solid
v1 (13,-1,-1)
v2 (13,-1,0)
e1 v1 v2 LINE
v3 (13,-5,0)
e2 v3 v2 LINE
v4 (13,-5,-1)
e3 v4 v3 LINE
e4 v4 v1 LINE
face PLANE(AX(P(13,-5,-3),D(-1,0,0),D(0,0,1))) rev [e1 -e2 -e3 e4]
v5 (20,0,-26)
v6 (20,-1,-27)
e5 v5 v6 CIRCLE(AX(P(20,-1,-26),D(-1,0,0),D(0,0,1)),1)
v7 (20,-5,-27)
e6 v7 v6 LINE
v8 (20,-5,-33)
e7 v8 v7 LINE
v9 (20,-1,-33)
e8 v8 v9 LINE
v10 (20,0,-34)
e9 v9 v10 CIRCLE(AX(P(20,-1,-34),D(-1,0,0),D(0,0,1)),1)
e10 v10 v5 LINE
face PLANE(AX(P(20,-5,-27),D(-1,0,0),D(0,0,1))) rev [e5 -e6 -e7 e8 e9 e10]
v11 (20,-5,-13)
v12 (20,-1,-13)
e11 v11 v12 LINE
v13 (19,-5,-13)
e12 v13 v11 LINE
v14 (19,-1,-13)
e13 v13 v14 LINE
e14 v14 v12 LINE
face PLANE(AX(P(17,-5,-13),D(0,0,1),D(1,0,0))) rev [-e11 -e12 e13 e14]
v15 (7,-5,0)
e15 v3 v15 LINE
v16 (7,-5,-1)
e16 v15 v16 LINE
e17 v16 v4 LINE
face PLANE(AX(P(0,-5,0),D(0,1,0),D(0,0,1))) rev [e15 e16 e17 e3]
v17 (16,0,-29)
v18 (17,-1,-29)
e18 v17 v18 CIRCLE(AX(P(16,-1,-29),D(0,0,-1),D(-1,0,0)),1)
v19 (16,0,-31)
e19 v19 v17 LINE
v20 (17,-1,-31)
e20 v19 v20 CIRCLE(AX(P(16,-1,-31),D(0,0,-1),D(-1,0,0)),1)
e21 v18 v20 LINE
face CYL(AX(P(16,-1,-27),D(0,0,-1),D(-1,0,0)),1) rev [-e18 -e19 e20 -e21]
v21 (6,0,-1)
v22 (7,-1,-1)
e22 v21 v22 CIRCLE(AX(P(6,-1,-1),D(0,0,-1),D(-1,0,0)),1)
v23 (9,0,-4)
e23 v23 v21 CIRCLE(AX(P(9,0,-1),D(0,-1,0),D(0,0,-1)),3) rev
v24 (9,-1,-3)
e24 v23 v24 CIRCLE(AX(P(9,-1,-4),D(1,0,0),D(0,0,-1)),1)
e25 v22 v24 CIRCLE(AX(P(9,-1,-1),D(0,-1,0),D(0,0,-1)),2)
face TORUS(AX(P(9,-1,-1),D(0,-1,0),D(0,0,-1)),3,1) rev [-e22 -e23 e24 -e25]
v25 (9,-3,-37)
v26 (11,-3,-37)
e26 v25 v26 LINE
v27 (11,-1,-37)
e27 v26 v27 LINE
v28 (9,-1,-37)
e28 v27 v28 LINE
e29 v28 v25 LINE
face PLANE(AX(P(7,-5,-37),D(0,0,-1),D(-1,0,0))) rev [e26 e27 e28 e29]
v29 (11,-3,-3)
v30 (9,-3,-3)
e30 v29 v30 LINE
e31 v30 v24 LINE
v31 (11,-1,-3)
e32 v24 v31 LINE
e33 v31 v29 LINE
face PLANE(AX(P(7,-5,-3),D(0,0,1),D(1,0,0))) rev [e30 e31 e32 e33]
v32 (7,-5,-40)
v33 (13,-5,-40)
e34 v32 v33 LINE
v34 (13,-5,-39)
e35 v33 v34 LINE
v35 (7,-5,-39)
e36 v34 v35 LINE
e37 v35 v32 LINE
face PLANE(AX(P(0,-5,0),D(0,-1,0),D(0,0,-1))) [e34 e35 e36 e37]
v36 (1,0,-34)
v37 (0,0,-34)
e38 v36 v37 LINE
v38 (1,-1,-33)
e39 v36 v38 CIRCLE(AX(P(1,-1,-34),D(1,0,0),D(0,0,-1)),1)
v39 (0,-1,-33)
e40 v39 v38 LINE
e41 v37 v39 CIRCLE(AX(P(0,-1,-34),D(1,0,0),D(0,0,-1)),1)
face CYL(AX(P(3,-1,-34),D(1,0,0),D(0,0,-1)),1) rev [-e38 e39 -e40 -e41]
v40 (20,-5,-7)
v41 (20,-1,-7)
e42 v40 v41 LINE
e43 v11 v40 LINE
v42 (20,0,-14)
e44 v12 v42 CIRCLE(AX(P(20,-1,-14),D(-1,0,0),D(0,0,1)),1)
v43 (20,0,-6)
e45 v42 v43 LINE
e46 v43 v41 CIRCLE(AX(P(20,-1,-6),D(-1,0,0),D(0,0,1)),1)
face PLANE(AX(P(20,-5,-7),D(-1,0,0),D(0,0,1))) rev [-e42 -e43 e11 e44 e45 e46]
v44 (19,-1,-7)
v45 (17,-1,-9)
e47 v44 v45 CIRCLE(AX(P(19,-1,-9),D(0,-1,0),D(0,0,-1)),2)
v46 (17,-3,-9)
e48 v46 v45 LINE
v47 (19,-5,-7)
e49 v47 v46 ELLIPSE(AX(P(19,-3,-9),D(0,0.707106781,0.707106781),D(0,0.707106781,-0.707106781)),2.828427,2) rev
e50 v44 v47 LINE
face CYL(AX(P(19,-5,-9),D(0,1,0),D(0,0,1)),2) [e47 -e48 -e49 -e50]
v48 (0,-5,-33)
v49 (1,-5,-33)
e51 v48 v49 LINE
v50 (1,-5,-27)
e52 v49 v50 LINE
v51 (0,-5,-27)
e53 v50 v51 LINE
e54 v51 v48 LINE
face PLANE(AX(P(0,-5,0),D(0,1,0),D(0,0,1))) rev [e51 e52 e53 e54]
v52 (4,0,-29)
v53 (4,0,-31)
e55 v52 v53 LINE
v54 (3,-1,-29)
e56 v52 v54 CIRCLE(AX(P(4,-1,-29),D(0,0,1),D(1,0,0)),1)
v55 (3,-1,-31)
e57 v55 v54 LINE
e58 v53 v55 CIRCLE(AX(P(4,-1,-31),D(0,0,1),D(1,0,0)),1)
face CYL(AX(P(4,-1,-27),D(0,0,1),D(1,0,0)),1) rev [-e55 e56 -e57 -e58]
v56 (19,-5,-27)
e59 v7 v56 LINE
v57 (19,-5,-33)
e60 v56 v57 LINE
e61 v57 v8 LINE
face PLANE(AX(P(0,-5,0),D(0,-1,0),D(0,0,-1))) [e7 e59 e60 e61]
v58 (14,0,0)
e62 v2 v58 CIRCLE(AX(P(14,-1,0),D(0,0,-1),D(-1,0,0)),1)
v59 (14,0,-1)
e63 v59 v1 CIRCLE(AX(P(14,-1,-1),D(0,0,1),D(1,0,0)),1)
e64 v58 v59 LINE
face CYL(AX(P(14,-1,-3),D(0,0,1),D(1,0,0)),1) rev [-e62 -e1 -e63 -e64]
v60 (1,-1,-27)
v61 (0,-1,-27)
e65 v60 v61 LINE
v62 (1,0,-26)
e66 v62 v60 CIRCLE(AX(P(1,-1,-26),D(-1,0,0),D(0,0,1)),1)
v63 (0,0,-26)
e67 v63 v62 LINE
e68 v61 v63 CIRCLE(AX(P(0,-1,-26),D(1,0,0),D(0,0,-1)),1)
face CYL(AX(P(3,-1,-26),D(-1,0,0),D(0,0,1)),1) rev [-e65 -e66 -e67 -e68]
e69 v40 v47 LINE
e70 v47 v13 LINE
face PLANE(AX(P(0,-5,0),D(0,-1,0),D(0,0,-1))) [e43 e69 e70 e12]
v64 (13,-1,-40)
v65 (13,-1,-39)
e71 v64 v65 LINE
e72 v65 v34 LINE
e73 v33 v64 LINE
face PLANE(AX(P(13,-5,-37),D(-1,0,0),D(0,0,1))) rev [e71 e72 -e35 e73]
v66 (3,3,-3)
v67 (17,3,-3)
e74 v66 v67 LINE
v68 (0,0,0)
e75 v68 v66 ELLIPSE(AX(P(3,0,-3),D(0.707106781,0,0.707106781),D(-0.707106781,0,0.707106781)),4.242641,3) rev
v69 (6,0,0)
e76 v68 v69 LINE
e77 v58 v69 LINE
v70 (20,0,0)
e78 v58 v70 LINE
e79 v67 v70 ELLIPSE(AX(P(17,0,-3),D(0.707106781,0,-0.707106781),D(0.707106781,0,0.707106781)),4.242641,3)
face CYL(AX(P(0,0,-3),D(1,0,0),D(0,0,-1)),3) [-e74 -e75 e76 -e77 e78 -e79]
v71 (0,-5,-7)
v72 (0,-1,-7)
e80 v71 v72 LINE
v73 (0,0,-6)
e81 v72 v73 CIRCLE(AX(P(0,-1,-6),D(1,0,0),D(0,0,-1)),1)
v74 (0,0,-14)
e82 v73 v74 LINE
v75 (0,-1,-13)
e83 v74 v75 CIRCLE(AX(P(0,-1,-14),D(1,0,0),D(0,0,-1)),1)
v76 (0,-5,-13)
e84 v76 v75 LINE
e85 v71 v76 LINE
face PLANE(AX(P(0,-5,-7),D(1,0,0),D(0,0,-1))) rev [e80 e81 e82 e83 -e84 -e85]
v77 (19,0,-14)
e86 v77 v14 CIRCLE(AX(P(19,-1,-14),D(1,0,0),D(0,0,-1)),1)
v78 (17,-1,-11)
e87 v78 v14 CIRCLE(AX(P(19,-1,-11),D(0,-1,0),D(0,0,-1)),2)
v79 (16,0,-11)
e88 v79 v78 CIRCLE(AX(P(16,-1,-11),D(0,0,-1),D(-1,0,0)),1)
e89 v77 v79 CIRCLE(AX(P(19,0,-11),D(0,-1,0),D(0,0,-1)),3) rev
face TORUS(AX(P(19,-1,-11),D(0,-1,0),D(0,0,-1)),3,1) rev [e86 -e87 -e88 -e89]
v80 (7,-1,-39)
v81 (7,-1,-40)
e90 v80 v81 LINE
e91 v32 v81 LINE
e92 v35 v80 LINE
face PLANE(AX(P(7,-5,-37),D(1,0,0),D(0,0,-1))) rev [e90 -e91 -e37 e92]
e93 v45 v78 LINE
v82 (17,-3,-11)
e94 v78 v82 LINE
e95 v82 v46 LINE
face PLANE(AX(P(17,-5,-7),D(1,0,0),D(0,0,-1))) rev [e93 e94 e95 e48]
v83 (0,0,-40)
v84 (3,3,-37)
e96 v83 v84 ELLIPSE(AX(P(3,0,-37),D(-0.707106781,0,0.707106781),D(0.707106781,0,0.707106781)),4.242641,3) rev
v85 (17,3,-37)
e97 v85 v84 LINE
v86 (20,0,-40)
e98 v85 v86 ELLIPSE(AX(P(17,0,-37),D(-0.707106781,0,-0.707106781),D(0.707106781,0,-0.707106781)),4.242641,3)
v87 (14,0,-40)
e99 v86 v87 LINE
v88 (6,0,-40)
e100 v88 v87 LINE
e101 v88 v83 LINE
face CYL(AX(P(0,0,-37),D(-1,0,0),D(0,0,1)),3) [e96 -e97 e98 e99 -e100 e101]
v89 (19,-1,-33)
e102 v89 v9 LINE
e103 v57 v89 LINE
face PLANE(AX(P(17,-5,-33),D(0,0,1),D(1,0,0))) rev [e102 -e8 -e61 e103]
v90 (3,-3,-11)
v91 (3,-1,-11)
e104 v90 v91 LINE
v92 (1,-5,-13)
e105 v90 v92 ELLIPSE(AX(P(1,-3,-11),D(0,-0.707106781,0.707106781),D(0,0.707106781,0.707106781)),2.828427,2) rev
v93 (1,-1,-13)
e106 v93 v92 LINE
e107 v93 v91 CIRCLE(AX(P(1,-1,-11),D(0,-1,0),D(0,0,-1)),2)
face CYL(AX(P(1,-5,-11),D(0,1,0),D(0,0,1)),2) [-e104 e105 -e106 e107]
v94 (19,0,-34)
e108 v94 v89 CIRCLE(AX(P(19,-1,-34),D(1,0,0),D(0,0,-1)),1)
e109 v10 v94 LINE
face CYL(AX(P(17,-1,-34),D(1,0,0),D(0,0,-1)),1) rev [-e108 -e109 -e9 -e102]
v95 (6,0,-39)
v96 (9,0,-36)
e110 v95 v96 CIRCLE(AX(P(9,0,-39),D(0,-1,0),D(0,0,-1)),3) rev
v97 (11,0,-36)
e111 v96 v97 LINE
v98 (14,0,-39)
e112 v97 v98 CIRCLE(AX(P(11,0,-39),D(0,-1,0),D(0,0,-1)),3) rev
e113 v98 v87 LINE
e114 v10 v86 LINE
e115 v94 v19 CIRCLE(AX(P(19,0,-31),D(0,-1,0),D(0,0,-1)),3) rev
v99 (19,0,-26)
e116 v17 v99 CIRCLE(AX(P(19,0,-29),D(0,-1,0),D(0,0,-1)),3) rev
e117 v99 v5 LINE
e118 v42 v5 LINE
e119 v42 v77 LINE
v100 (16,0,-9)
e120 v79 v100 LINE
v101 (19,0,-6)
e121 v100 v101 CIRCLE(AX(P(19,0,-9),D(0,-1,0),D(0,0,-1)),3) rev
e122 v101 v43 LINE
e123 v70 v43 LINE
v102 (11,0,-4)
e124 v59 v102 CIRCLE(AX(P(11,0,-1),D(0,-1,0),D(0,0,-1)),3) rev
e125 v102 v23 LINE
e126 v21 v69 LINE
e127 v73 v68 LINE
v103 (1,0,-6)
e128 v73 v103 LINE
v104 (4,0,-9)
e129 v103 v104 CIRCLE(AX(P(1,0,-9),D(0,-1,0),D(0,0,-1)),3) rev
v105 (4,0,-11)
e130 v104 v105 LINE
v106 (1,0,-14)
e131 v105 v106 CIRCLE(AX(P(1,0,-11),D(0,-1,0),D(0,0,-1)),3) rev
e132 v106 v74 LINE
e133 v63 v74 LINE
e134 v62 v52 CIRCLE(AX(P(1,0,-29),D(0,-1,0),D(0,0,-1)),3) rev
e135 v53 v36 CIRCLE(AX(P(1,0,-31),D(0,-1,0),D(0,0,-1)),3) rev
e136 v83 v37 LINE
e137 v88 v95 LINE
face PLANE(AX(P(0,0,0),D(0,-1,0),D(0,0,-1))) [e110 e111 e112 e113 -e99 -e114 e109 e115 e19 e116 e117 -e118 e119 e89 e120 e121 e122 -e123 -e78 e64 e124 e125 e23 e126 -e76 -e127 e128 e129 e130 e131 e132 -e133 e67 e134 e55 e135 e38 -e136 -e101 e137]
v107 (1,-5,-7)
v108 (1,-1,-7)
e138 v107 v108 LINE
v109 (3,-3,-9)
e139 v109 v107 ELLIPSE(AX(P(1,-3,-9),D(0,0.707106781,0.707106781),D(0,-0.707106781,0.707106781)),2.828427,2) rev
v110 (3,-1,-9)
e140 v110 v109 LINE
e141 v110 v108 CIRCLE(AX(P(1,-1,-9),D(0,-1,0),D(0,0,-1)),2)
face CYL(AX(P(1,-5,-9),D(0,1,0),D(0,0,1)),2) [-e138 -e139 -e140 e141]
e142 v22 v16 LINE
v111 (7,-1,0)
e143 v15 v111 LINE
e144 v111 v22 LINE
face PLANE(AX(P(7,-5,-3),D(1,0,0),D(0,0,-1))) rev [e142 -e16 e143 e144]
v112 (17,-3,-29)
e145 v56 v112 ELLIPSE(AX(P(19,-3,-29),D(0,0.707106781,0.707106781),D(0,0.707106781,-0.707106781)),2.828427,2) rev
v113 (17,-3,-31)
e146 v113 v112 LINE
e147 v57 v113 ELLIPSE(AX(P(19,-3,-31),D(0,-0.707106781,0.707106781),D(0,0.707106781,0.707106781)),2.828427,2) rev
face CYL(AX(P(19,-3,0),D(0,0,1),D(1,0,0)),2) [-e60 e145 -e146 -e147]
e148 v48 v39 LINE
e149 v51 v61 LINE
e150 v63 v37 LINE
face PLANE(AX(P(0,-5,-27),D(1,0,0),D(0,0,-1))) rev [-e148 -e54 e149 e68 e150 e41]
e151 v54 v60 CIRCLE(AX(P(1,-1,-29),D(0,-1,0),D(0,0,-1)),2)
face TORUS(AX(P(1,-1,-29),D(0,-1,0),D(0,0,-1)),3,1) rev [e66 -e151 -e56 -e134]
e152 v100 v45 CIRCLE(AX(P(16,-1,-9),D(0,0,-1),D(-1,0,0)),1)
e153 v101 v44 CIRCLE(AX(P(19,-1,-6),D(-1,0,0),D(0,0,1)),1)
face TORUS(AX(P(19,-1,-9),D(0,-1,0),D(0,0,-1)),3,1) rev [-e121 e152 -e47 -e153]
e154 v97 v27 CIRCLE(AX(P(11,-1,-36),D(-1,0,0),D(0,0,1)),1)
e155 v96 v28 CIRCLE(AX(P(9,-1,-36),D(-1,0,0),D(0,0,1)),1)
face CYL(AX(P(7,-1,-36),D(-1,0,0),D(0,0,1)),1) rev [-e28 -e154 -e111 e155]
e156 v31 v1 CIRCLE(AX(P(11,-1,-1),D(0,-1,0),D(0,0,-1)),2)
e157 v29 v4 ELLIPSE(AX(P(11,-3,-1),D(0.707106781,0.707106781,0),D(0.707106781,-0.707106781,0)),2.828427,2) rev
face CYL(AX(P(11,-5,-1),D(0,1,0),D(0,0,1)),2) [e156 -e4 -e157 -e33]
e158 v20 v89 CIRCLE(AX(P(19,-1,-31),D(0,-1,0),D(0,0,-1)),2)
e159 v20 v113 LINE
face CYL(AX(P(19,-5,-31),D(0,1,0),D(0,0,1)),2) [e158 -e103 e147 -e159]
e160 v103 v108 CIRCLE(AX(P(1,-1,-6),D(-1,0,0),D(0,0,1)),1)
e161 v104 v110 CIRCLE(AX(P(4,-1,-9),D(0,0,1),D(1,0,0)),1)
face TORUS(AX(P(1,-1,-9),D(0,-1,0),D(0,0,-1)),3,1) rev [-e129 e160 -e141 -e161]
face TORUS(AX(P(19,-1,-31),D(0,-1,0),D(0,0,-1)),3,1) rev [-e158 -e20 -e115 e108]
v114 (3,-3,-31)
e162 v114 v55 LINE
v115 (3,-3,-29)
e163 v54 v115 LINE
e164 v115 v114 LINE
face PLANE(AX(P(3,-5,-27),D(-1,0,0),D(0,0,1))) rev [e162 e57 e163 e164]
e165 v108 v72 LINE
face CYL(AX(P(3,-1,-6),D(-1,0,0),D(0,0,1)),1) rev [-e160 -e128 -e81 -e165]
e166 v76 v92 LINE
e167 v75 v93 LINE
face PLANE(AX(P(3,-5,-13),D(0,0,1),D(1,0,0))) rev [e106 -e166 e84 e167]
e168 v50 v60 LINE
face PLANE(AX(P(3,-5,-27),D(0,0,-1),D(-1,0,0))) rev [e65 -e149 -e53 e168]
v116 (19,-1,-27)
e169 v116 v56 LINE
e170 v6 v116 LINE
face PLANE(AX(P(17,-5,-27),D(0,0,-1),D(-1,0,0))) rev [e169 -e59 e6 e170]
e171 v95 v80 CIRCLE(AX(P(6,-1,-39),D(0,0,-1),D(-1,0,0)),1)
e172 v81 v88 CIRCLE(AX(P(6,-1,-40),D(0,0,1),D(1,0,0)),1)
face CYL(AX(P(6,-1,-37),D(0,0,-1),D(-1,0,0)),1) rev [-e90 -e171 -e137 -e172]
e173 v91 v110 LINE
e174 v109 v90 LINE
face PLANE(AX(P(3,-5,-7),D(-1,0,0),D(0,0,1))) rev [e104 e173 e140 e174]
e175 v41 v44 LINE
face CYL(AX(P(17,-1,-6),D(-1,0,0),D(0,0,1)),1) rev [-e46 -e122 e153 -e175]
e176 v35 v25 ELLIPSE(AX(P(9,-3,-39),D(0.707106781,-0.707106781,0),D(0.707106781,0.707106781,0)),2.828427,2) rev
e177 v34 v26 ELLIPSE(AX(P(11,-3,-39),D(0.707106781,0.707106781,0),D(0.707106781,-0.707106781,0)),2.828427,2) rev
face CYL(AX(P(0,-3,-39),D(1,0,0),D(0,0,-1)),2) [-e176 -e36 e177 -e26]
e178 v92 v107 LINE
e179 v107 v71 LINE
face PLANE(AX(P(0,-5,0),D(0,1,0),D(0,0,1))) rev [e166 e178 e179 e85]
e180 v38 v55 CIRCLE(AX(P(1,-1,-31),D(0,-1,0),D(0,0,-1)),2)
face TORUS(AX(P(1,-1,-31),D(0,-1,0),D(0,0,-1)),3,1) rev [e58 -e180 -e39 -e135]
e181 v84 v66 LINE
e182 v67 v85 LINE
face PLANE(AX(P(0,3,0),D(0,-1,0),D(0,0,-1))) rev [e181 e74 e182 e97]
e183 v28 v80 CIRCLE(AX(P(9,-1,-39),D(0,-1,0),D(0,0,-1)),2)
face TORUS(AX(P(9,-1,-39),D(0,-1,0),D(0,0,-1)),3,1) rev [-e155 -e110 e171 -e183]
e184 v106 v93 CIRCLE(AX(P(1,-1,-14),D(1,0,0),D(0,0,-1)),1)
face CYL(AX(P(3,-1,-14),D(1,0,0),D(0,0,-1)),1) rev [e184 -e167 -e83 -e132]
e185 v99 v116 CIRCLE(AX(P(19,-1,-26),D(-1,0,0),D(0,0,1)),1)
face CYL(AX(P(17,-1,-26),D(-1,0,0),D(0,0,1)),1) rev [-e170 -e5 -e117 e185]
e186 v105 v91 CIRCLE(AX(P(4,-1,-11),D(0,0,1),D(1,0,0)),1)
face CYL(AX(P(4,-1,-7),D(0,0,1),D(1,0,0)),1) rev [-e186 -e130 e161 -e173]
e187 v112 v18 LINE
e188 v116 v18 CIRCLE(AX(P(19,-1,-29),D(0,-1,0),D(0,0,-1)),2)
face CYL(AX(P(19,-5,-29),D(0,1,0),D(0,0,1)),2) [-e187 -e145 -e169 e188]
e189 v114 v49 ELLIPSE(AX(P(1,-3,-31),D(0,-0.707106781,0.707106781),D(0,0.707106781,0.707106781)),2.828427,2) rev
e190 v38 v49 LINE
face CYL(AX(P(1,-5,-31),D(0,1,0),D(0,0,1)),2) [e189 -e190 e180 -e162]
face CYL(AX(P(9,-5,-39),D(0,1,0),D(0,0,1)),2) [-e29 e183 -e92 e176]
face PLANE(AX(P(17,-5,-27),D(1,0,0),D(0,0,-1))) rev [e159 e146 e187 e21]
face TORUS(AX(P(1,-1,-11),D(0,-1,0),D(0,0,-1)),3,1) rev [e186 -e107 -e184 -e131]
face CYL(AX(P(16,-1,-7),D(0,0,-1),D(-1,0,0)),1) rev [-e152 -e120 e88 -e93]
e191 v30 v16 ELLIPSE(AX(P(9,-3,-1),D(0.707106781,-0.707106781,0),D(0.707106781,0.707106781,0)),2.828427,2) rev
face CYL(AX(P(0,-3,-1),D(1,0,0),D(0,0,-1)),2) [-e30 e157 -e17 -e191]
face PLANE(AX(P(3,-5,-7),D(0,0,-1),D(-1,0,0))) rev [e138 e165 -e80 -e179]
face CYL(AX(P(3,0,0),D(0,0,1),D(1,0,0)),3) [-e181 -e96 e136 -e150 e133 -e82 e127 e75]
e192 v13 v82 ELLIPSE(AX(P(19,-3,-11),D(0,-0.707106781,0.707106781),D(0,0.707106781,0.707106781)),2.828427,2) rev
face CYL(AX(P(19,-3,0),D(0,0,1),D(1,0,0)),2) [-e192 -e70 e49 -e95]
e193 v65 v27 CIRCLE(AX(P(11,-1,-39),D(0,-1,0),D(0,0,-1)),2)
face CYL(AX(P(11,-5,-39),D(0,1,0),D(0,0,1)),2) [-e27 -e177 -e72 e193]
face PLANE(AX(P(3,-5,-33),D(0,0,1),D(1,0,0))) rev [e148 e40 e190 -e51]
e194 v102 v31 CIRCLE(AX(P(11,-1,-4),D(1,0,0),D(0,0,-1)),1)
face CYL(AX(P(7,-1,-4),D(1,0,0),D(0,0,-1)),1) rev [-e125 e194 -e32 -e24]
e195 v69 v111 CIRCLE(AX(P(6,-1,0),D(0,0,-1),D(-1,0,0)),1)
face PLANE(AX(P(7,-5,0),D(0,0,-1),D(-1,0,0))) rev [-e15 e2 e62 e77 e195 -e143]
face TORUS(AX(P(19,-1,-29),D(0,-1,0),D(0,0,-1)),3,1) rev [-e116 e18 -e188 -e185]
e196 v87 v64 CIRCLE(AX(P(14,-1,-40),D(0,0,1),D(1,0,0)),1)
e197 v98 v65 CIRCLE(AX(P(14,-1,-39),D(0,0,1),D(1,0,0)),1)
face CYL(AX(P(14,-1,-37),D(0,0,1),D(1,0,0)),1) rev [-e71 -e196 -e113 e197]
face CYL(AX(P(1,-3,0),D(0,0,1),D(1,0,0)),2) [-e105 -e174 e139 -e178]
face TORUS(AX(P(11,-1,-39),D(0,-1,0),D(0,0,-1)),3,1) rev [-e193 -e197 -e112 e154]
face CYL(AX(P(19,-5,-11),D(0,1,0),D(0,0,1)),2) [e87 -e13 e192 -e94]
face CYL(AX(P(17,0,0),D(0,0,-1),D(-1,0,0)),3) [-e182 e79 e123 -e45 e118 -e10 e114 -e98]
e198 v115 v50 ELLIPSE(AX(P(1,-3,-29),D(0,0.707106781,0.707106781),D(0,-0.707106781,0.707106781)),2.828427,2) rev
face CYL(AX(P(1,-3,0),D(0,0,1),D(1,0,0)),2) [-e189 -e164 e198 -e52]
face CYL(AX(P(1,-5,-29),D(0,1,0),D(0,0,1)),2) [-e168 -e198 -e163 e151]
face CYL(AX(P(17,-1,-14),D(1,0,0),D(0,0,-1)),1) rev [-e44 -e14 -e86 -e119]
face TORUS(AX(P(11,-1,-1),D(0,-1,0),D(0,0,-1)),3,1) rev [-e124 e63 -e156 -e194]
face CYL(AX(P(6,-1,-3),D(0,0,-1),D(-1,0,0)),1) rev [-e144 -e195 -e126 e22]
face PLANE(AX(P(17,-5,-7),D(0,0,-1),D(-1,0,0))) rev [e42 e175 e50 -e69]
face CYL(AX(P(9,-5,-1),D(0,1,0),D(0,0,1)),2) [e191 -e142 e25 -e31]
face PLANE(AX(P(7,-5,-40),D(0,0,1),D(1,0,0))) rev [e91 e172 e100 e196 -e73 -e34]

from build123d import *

# Parameters (mm, degrees)
ESBO_O1_W                = 20
ESBO_O1_H                = 40
RESSALTO_EXTRUS_O1_DEPTH = 3
FILETE1_R                = 3
ESBO_O2_W                = 6
ESBO_O2_H                = 3
ESBO_O2_W_2              = 3
ESBO_O2_H_2              = 6
RESSALTO_EXTRUS_O2_DEPTH = 5
FILETE2_R                = 2
FILETE3_R                = 1


with BuildPart() as part:
    # Esboço1 → Ressalto-extrusão1 (new body)
    with BuildSketch(Plane(origin=(0, 0, 0), x_dir=(1, 0, 0), z_dir=(0, 1, 0))):
        with Locations((10, 20)):
            Rectangle(ESBO_O1_W, ESBO_O1_H)
    extrude(amount=RESSALTO_EXTRUS_O1_DEPTH)

    # Filete1
    filete1_edges = [part.edges().sort_by_distance(p)[0] for p in [
        (10, 3, -40),
        (20, 3, -20),
        (10, 3, 0),
        (0, 3, -20),
    ]]
    fillet(filete1_edges, radius=FILETE1_R - 0.0001)  # a hair under: the kernel refuses the full size

    # Esboço2 → Ressalto-extrusão2 (add)
    with BuildSketch(Plane.XZ):
        with Locations((10, -1.5)):
            Rectangle(ESBO_O2_W, ESBO_O2_H)
        with Locations((10, -38.5)):
            Rectangle(ESBO_O2_W, ESBO_O2_H)
        with Locations((1.5, -30)):
            Rectangle(ESBO_O2_W_2, ESBO_O2_H_2)
        with Locations((18.5, -10)):
            Rectangle(ESBO_O2_W_2, ESBO_O2_H_2)
        with Locations((18.5, -30)):
            Rectangle(ESBO_O2_W_2, ESBO_O2_H_2)
        with Locations((1.5, -10)):
            Rectangle(ESBO_O2_W_2, ESBO_O2_H_2)
    extrude(amount=RESSALTO_EXTRUS_O2_DEPTH)

    # Filete2
    filete2_edges = [part.edges().sort_by_distance(p)[0] for p in [
        (13, -2.5, -3),
        (7, -2.5, -3),
        (10, -5, -3),
        (7, -2.5, -37),
        (13, -2.5, -37),
        (10, -5, -37),
        (17, -2.5, -7),
        (17, -2.5, -13),
        (17, -5, -10),
        (17, -2.5, -27),
        (17, -2.5, -33),
        (17, -5, -30),
        (3, -2.5, -33),
        (3, -2.5, -27),
        (3, -5, -30),
        (3, -2.5, -13),
        (3, -2.5, -7),
        (3, -5, -10),
    ]]
    fillet(filete2_edges, radius=FILETE2_R)

    # Filete3
    filete3_edges = [part.edges().sort_by_distance(p)[0] for p in [
        (3, 0, -30),
        (0.5, 0, -27),
        (19.5, 0, -33),
        (17, 0, -30),
        (19.5, 0, -13),
        (17, 0, -10),
        (10, 0, -3),
        (13, 0, -0.5),
        (3, 0, -10),
        (0.5, 0, -7),
        (7.585786438, 0, -37.585786438),
        (12.414213562, 0, -37.585786438),
        (2.414213562, 0, -32.414213562),
        (2.414213562, 0, -27.585786438),
        (17.585786438, 0, -32.414213562),
        (17.585786438, 0, -27.585786438),
        (17.585786438, 0, -12.414213562),
        (17.585786438, 0, -7.585786438),
        (7.585786438, 0, -2.414213562),
        (12.414213562, 0, -2.414213562),
        (2.414213562, 0, -12.414213562),
        (2.414213562, 0, -7.585786438),
        (7, 0, -0.5),
        (13, 0, -39.5),
        (19.5, 0, -7),
        (19.5, 0, -27),
        (0.5, 0, -33),
        (0.5, 0, -13),
        (7, 0, -39.5),
        (10, 0, -37),
    ]]
    fillet(filete3_edges, radius=FILETE3_R)


solid = part.part
